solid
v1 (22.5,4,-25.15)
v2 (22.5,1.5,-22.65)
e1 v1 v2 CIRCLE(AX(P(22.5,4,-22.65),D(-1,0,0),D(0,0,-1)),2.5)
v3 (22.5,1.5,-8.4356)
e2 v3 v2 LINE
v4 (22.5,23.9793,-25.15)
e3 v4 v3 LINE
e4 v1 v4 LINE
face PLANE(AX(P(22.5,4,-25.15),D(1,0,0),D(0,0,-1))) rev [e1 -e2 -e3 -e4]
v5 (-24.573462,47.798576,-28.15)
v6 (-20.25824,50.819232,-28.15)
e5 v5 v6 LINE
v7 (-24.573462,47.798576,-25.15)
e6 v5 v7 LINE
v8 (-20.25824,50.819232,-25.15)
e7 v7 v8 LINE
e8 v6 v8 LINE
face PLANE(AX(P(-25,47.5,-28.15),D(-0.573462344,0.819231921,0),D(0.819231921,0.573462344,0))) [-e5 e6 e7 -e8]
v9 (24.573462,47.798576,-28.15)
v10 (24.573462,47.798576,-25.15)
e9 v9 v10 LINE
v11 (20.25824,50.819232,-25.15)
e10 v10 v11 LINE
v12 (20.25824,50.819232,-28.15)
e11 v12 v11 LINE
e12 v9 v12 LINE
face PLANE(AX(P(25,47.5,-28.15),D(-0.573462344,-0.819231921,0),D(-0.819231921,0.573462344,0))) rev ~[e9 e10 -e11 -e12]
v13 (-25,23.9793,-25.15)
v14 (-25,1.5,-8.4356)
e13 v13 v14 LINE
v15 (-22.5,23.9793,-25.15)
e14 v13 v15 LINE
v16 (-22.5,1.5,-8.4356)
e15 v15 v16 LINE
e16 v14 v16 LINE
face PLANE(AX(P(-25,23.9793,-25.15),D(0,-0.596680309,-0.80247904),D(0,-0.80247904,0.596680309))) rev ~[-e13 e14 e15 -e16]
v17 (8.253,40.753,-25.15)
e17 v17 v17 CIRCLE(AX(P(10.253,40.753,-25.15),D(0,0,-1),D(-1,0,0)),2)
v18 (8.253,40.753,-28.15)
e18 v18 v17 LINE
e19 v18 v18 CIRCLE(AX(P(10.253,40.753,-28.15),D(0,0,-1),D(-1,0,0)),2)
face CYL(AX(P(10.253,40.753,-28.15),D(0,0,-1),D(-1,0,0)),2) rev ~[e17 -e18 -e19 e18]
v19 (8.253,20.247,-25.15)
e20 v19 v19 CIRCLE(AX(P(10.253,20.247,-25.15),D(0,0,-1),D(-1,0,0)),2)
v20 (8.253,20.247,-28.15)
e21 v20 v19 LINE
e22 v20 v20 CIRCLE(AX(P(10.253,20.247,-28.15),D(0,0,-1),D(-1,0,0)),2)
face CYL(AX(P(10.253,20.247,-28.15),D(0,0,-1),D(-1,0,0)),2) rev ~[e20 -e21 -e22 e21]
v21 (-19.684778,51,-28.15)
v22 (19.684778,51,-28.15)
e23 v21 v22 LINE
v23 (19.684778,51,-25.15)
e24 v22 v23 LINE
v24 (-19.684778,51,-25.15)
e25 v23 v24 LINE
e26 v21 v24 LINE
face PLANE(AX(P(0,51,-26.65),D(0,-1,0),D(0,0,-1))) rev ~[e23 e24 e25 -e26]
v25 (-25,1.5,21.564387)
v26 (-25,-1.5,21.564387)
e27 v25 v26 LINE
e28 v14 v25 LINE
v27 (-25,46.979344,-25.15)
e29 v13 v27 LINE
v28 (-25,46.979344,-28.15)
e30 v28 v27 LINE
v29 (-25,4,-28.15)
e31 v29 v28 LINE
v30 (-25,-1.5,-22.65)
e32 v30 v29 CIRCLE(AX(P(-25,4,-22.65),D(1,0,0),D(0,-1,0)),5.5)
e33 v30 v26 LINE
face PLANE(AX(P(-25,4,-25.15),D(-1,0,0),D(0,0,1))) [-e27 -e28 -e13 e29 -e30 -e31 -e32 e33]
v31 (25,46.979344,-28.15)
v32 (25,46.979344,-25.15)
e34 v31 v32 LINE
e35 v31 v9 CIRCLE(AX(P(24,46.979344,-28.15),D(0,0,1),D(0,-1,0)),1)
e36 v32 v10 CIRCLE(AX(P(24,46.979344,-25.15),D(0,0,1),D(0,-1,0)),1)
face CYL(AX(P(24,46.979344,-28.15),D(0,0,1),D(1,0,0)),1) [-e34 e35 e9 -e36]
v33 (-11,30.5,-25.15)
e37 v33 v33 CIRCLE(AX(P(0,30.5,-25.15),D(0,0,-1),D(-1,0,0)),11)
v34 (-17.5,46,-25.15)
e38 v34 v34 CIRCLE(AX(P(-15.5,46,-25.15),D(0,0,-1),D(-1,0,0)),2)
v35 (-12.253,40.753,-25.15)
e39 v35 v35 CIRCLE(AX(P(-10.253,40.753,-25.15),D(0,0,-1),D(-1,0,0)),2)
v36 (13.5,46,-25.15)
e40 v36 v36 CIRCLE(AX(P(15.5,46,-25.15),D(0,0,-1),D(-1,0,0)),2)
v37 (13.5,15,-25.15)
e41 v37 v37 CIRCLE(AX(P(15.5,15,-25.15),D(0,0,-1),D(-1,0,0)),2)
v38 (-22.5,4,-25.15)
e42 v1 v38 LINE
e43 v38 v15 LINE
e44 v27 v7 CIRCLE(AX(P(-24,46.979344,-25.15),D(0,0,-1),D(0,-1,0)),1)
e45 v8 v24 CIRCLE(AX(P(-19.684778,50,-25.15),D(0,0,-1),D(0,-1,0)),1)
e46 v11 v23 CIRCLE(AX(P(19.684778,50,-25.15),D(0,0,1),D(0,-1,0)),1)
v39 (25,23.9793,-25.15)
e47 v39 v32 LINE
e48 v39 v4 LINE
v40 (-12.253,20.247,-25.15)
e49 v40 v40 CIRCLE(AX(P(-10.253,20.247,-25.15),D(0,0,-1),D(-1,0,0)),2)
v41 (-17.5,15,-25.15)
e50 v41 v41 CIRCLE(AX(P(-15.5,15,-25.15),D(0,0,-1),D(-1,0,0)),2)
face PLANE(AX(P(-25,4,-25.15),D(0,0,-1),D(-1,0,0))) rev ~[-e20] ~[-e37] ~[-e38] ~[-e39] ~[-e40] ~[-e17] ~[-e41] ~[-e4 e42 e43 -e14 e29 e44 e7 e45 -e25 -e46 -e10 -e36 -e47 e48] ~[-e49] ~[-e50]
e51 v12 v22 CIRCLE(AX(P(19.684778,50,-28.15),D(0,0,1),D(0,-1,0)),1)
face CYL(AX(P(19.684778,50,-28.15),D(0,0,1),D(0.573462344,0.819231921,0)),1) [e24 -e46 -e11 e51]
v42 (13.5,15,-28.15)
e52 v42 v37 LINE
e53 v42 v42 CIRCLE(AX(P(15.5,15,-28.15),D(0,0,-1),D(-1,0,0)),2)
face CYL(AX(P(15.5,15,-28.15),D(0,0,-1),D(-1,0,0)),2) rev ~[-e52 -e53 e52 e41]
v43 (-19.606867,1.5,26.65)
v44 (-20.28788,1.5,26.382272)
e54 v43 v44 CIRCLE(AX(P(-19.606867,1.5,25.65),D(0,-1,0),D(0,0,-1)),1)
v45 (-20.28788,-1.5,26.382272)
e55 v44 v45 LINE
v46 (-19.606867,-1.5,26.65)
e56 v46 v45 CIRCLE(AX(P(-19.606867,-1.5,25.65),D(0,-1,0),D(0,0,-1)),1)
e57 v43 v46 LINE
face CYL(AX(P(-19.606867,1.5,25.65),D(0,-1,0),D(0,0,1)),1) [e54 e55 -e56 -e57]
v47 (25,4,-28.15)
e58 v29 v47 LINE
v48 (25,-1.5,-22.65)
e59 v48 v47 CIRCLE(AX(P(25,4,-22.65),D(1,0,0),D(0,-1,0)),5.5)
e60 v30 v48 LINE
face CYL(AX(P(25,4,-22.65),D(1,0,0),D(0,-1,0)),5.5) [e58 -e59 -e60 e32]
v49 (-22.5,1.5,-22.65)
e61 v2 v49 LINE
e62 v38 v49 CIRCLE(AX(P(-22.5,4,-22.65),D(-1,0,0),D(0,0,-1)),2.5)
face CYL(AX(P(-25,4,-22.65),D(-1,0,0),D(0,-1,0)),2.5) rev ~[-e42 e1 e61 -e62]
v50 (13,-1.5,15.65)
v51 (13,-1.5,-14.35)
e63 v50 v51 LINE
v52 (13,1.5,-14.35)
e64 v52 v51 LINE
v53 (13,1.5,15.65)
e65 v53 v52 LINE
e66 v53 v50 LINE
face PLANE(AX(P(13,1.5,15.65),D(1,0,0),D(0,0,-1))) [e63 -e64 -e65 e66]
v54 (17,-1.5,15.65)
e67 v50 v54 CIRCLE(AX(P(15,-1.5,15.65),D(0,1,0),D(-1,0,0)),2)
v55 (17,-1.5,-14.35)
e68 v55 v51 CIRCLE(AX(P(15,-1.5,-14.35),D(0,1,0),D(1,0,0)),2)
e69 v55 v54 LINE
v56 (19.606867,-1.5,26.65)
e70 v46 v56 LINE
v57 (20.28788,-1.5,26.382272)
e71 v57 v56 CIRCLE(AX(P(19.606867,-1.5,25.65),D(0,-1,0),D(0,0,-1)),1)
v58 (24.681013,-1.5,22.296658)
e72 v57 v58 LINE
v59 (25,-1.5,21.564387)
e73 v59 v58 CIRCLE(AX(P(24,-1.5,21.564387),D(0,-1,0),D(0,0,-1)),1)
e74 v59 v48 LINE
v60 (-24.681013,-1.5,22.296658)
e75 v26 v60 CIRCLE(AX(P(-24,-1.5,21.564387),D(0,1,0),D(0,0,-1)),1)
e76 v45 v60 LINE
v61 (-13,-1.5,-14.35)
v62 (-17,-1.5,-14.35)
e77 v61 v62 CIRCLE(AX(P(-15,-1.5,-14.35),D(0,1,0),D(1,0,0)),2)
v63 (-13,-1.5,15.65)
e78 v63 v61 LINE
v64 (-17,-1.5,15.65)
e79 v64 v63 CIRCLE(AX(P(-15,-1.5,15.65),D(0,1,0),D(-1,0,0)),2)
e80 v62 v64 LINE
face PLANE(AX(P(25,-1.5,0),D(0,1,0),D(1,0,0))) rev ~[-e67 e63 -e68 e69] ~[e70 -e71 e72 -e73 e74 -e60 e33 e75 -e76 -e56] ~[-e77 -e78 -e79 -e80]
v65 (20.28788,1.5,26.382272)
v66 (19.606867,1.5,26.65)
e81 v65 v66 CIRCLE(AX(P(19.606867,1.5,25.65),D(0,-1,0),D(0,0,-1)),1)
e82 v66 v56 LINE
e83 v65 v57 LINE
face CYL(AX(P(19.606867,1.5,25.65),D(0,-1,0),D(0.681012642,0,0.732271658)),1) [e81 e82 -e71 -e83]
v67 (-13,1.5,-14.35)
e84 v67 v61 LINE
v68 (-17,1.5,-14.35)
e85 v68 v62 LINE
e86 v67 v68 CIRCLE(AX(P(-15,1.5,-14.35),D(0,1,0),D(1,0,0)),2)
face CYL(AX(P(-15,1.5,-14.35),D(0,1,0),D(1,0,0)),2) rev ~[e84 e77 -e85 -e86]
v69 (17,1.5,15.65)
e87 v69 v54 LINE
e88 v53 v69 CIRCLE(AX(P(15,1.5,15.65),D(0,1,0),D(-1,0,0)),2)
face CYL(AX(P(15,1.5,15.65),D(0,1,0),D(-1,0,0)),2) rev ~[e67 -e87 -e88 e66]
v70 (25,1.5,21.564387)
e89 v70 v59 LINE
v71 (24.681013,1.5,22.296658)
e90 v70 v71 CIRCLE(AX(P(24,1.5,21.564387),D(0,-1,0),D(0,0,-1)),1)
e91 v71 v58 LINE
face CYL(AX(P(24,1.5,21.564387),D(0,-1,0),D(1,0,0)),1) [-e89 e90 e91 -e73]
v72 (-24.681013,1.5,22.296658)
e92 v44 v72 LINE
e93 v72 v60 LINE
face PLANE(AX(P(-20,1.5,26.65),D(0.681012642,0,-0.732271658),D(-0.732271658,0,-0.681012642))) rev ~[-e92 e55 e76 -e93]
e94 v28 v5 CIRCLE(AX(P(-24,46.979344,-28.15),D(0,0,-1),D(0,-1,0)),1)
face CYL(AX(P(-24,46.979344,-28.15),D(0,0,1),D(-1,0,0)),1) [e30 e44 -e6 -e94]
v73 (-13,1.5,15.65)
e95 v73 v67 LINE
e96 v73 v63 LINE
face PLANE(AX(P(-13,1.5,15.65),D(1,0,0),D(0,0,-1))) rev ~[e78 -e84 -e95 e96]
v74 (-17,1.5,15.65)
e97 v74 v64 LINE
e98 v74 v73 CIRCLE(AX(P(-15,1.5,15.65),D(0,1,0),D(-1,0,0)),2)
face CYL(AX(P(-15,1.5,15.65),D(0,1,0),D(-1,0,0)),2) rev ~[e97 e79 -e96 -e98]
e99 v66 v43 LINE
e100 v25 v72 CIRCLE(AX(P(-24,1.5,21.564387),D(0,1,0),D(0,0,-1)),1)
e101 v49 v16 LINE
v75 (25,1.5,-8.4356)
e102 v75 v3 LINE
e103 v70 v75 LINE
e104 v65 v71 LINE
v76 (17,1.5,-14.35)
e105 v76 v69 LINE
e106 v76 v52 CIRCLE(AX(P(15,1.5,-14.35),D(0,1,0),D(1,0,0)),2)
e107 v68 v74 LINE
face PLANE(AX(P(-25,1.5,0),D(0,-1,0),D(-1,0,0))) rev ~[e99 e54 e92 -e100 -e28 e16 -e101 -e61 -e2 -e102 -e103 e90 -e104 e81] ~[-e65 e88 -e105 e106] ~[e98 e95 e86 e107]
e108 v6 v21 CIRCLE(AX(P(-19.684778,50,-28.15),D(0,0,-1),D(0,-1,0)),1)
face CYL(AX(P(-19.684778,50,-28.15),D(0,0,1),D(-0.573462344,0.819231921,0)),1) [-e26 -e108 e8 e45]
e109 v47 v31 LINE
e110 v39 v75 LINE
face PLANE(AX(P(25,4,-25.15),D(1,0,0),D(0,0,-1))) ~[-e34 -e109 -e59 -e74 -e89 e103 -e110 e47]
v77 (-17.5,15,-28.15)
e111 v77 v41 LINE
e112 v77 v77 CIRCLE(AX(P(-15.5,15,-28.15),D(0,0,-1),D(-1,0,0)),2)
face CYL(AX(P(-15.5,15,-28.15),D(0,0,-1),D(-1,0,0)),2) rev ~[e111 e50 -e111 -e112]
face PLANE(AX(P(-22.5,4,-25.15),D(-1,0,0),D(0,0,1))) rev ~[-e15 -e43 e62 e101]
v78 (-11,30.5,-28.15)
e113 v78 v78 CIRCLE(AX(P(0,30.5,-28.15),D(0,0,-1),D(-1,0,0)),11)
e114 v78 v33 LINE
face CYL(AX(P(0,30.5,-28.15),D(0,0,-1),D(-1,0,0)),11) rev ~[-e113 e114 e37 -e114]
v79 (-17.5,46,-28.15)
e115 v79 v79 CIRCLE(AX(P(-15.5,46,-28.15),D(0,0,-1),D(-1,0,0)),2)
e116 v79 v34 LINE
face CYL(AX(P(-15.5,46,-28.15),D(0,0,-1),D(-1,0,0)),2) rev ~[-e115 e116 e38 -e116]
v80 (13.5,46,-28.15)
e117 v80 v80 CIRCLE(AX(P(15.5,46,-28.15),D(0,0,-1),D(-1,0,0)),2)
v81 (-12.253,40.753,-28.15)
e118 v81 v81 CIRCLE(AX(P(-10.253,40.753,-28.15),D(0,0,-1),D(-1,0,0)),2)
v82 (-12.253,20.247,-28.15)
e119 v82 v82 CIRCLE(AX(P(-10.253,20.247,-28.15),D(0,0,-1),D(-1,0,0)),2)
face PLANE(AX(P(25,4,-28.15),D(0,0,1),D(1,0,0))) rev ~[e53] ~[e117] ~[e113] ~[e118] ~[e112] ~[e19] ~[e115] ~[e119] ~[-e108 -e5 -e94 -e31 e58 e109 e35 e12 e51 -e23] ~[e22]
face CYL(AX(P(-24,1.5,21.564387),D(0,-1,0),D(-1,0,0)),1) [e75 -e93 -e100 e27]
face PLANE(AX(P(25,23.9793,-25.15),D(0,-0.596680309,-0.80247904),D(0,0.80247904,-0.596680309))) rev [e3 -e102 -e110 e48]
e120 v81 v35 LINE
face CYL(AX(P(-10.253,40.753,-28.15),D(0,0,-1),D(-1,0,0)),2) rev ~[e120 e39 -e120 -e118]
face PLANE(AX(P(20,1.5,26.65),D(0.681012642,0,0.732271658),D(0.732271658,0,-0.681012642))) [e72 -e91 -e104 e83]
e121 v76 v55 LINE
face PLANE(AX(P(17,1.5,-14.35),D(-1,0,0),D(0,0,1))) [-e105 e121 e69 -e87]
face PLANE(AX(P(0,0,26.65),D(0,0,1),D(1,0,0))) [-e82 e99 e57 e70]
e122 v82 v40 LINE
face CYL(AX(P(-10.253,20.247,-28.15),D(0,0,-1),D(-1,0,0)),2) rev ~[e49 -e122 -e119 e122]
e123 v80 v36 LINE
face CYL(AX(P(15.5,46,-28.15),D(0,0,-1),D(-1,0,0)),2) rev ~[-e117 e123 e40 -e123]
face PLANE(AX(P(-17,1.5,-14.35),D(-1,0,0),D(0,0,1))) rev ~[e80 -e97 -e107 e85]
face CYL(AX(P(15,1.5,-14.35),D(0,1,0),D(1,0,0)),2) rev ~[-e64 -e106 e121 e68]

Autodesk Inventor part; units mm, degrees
ref_plane "YZ Plane" through (0, 0, 0) normal (1, 0, 0) x (0, 1, 0)
ref_plane "XZ Plane" through (0, 0, 0) normal (0, 1, 0) x (-1, 0, 0)
sketch "Sketch1" plane through (0, 0, 0) normal (1, 0, 0) x (0, 1, 0)
  line L0 (0, 0) -> (0, -22.65)
  line L1 (0, 0) -> (0, 26.65)
  line L2 (4, -26.65) -> (51, -26.65)
  arc A0 (0, -22.65) -> (4, -26.65) centre (4, -22.65) ccw
  point P0 (0, -26.65)
  dimension "d0" = 26.65
  dimension "d1" = 26.65
  dimension "d2" = 51
  dimension "d3" = 4
ref_plane "Work Plane1" through (0, 0, 26.65) normal (0, 0, 1) x (1, 0, 0)
sketch "Sketch2" plane through (0, 0, 26.65) normal (0, 0, 1) x (1, 0, 0)
  line L0 (-25, 1.5) -> (25, 1.5)
  line L1 (25, 1.5) -> (25, -1.5)
  line L2 (25, -1.5) -> (-25, -1.5)
  line L3 (-25, -1.5) -> (-25, 1.5)
  line L4 (-25, 1.5) -> (25, -1.5) construction
  line L5 (25, 1.5) -> (-25, -1.5) construction
  point P0 (0, 0)
  dimension "d4" = 50
  dimension "d5" = 3
sweep "Sweep1" add profiles "Sketch2" path "Sketch1"
sketch "Sketch3" plane through (25, 4, -28.15) normal (0, 0, -1) x (-1, 0, 0)
  line L0 (0, 47) -> (50, 47) construction
  line L1 (50, 0) -> (50, 47) construction
  circle A0 centre (25, 26.5) radius 11
  point P0 (25, -4)
  dimension "d8" = 22
  dimension "d9" = 20.5
  dimension "d10" = 25
extrude "Extrusion1" cut sketch "Sketch3" against normal blind 10
sketch "Sketch4" plane through (25, 4, -28.15) normal (0, 0, -1) x (-1, 0, 0)
  circle A0 centre (25, 26.5) radius 11 construction
  line L0 (50, 0) -> (50, 47) construction
  line L1 (0, 0) -> (0, 47) construction
  line L2 (0, 47) -> (50, 47) construction
  line L3 (0, 0) -> (50, 0) construction
  circle A1 centre (40.5, 42) radius 2
  line L4 (25, 26.5) -> (14, 26.5) construction
  circle A2 centre (25, 26.5) radius 11 construction
  line L5 (25, 26.5) -> (25, 15.5) construction
  circle A3 centre (9.5, 42) radius 2
  circle A4 centre (40.5, 11) radius 2
  circle A5 centre (9.5, 11) radius 2
  line L6 (25, 26.5) -> (40.5, 42) construction
  circle A6 centre (35.253, 36.753) radius 2
  circle A7 centre (14.747, 36.753) radius 2
  circle A8 centre (35.253, 16.247) radius 2
  circle A9 centre (14.747, 16.247) radius 2
  point P0 (25, -4)
  point P1 (33.8388, 35.3388)
  point P2 (32.7782, 34.2782)
  dimension "d17" = 4
  dimension "d13" = 4
  dimension "d14" = 15.5
  dimension "d15" = 15.5
  dimension "d18" = 1.5
extrude "Extrusion2" cut sketch "Sketch4" against normal blind 10
sketch "Sketch5" plane through (25, 4, -28.15) normal (0, 0, -1) x (-1, 0, 0)
  line L0 (0, 47) -> (50, 47) construction
  line L1 (50, 0) -> (50, 47) construction
  line L2 (0, 0) -> (0, 47) construction
  line L3 (0, 43.5) -> (5, 47)
  line L4 (25, 47) -> (25, 37.5) construction
  circle A0 centre (25, 26.5) radius 11 construction
  line L5 (50, 43.5) -> (45, 47)
  line L6 (0, 43.5) -> (0, 47)
  line L7 (0, 47) -> (5, 47)
  line L8 (45, 47) -> (50, 47)
  line L9 (50, 47) -> (50, 43.5)
  line L10 (50, 0) -> (50, 47) projected
  point P0 (25, -4)
  point P1 (0, 23.5)
  dimension "d21" = 20
  dimension "d22" = 20
extrude "Extrusion3" cut sketch "Sketch5" against normal blind 10
sketch "Sketch6" plane through (-25, 1.5, 26.65) normal (0, 1, 0) x (1, 0, 0)
  line L0 (0, 0) -> (0, 49.3) construction
  line L1 (0, 0) -> (50, 0) construction
  line L2 (50, 0) -> (50, 49.3) construction
  line L3 (45, 0) -> (50, 4.65)
  line L4 (25, 0) -> (25, 26.65) construction
  line L5 (5, 0) -> (0, 4.65)
  line L6 (5, 0) -> (0, 0)
  line L7 (0, 4.65) -> (0, 0)
  line L8 (45, 0) -> (50, 0)
  line L9 (50, 4.65) -> (50, 0)
  point P0 (50, 24.65)
  dimension "d25" = 20
  dimension "d26" = 20
extrude "Extrusion4" cut sketch "Sketch6" against normal blind 10
sketch "Sketch7" plane through (-25, 1.5, -22.65) normal (0, 1, 0) x (1, 0, 0)
  line L0 (10, -40.3) -> (10, -6.3) construction
  line L1 (12, -38.3) -> (12, -8.3)
  line L2 (8, -8.3) -> (8, -38.3)
  arc A0 (8, -38.3) -> (12, -38.3) centre (10, -38.3) ccw
  arc A1 (12, -8.3) -> (8, -8.3) centre (10, -8.3) ccw
  line L3 (11.5, 2.5) -> (7.5, 2.5) construction
  line L4 (0, -44.65) -> (0, 0) construction
  line L5 (45, -49.3) -> (5, -49.3) construction
  line L6 (25, -49.3) -> (25, -22.65) construction
  line L7 (38, -38.3) -> (38, -8.3)
  line L8 (42, -8.3) -> (42, -38.3)
  arc A2 (38, -38.3) -> (42, -38.3) centre (40, -38.3) ccw
  arc A3 (42, -8.3) -> (38, -8.3) centre (40, -8.3) ccw
  point P0 (10, -23.3)
  dimension "d29" = 34
  dimension "d30" = 4
  dimension "d31" = 8
  dimension "d32" = 9
extrude "Extrusion5" cut sketch "Sketch7" against normal blind 10
fillet "Fillet1" radius 1 8 edges at (20, 51, -26.65) (-20, 51, -26.65) (-25, 47.5, -26.65) (25, 47.5, -26.65) (25, 0, 22) (20, 0, 26.65) (-20, 0, 26.65) (-25, 0, 22)
sketch "Sketch8" plane through (-25, 4, -25.15) normal (-1, 0, 0) x (0, 0, 1)
  line L0 (0, 0) -> (0, 42.9793) projected
  arc A0 (0, 0) -> (2.5, -2.5) centre (2.5, 0) ccw projected
  line L1 (46.7144, -2.5) -> (2.5, -2.5) projected
  line L2 (10.8, -2.5) -> (40.8, -2.5) projected
  line L3 (0, 19.9793) -> (16.7144, -2.5)
  point P0 (25.15, -4)
  dimension "d36" = 30
  dimension "d37" = 23
extrude "Extrusion6" add sketch "Sketch8" against normal blind 2.5
mirror "Mirror1" about plane through (0, 0, 0) normal (1, 0, 0) of "Extrusion6"
properties part number "Stepper Bracket"
